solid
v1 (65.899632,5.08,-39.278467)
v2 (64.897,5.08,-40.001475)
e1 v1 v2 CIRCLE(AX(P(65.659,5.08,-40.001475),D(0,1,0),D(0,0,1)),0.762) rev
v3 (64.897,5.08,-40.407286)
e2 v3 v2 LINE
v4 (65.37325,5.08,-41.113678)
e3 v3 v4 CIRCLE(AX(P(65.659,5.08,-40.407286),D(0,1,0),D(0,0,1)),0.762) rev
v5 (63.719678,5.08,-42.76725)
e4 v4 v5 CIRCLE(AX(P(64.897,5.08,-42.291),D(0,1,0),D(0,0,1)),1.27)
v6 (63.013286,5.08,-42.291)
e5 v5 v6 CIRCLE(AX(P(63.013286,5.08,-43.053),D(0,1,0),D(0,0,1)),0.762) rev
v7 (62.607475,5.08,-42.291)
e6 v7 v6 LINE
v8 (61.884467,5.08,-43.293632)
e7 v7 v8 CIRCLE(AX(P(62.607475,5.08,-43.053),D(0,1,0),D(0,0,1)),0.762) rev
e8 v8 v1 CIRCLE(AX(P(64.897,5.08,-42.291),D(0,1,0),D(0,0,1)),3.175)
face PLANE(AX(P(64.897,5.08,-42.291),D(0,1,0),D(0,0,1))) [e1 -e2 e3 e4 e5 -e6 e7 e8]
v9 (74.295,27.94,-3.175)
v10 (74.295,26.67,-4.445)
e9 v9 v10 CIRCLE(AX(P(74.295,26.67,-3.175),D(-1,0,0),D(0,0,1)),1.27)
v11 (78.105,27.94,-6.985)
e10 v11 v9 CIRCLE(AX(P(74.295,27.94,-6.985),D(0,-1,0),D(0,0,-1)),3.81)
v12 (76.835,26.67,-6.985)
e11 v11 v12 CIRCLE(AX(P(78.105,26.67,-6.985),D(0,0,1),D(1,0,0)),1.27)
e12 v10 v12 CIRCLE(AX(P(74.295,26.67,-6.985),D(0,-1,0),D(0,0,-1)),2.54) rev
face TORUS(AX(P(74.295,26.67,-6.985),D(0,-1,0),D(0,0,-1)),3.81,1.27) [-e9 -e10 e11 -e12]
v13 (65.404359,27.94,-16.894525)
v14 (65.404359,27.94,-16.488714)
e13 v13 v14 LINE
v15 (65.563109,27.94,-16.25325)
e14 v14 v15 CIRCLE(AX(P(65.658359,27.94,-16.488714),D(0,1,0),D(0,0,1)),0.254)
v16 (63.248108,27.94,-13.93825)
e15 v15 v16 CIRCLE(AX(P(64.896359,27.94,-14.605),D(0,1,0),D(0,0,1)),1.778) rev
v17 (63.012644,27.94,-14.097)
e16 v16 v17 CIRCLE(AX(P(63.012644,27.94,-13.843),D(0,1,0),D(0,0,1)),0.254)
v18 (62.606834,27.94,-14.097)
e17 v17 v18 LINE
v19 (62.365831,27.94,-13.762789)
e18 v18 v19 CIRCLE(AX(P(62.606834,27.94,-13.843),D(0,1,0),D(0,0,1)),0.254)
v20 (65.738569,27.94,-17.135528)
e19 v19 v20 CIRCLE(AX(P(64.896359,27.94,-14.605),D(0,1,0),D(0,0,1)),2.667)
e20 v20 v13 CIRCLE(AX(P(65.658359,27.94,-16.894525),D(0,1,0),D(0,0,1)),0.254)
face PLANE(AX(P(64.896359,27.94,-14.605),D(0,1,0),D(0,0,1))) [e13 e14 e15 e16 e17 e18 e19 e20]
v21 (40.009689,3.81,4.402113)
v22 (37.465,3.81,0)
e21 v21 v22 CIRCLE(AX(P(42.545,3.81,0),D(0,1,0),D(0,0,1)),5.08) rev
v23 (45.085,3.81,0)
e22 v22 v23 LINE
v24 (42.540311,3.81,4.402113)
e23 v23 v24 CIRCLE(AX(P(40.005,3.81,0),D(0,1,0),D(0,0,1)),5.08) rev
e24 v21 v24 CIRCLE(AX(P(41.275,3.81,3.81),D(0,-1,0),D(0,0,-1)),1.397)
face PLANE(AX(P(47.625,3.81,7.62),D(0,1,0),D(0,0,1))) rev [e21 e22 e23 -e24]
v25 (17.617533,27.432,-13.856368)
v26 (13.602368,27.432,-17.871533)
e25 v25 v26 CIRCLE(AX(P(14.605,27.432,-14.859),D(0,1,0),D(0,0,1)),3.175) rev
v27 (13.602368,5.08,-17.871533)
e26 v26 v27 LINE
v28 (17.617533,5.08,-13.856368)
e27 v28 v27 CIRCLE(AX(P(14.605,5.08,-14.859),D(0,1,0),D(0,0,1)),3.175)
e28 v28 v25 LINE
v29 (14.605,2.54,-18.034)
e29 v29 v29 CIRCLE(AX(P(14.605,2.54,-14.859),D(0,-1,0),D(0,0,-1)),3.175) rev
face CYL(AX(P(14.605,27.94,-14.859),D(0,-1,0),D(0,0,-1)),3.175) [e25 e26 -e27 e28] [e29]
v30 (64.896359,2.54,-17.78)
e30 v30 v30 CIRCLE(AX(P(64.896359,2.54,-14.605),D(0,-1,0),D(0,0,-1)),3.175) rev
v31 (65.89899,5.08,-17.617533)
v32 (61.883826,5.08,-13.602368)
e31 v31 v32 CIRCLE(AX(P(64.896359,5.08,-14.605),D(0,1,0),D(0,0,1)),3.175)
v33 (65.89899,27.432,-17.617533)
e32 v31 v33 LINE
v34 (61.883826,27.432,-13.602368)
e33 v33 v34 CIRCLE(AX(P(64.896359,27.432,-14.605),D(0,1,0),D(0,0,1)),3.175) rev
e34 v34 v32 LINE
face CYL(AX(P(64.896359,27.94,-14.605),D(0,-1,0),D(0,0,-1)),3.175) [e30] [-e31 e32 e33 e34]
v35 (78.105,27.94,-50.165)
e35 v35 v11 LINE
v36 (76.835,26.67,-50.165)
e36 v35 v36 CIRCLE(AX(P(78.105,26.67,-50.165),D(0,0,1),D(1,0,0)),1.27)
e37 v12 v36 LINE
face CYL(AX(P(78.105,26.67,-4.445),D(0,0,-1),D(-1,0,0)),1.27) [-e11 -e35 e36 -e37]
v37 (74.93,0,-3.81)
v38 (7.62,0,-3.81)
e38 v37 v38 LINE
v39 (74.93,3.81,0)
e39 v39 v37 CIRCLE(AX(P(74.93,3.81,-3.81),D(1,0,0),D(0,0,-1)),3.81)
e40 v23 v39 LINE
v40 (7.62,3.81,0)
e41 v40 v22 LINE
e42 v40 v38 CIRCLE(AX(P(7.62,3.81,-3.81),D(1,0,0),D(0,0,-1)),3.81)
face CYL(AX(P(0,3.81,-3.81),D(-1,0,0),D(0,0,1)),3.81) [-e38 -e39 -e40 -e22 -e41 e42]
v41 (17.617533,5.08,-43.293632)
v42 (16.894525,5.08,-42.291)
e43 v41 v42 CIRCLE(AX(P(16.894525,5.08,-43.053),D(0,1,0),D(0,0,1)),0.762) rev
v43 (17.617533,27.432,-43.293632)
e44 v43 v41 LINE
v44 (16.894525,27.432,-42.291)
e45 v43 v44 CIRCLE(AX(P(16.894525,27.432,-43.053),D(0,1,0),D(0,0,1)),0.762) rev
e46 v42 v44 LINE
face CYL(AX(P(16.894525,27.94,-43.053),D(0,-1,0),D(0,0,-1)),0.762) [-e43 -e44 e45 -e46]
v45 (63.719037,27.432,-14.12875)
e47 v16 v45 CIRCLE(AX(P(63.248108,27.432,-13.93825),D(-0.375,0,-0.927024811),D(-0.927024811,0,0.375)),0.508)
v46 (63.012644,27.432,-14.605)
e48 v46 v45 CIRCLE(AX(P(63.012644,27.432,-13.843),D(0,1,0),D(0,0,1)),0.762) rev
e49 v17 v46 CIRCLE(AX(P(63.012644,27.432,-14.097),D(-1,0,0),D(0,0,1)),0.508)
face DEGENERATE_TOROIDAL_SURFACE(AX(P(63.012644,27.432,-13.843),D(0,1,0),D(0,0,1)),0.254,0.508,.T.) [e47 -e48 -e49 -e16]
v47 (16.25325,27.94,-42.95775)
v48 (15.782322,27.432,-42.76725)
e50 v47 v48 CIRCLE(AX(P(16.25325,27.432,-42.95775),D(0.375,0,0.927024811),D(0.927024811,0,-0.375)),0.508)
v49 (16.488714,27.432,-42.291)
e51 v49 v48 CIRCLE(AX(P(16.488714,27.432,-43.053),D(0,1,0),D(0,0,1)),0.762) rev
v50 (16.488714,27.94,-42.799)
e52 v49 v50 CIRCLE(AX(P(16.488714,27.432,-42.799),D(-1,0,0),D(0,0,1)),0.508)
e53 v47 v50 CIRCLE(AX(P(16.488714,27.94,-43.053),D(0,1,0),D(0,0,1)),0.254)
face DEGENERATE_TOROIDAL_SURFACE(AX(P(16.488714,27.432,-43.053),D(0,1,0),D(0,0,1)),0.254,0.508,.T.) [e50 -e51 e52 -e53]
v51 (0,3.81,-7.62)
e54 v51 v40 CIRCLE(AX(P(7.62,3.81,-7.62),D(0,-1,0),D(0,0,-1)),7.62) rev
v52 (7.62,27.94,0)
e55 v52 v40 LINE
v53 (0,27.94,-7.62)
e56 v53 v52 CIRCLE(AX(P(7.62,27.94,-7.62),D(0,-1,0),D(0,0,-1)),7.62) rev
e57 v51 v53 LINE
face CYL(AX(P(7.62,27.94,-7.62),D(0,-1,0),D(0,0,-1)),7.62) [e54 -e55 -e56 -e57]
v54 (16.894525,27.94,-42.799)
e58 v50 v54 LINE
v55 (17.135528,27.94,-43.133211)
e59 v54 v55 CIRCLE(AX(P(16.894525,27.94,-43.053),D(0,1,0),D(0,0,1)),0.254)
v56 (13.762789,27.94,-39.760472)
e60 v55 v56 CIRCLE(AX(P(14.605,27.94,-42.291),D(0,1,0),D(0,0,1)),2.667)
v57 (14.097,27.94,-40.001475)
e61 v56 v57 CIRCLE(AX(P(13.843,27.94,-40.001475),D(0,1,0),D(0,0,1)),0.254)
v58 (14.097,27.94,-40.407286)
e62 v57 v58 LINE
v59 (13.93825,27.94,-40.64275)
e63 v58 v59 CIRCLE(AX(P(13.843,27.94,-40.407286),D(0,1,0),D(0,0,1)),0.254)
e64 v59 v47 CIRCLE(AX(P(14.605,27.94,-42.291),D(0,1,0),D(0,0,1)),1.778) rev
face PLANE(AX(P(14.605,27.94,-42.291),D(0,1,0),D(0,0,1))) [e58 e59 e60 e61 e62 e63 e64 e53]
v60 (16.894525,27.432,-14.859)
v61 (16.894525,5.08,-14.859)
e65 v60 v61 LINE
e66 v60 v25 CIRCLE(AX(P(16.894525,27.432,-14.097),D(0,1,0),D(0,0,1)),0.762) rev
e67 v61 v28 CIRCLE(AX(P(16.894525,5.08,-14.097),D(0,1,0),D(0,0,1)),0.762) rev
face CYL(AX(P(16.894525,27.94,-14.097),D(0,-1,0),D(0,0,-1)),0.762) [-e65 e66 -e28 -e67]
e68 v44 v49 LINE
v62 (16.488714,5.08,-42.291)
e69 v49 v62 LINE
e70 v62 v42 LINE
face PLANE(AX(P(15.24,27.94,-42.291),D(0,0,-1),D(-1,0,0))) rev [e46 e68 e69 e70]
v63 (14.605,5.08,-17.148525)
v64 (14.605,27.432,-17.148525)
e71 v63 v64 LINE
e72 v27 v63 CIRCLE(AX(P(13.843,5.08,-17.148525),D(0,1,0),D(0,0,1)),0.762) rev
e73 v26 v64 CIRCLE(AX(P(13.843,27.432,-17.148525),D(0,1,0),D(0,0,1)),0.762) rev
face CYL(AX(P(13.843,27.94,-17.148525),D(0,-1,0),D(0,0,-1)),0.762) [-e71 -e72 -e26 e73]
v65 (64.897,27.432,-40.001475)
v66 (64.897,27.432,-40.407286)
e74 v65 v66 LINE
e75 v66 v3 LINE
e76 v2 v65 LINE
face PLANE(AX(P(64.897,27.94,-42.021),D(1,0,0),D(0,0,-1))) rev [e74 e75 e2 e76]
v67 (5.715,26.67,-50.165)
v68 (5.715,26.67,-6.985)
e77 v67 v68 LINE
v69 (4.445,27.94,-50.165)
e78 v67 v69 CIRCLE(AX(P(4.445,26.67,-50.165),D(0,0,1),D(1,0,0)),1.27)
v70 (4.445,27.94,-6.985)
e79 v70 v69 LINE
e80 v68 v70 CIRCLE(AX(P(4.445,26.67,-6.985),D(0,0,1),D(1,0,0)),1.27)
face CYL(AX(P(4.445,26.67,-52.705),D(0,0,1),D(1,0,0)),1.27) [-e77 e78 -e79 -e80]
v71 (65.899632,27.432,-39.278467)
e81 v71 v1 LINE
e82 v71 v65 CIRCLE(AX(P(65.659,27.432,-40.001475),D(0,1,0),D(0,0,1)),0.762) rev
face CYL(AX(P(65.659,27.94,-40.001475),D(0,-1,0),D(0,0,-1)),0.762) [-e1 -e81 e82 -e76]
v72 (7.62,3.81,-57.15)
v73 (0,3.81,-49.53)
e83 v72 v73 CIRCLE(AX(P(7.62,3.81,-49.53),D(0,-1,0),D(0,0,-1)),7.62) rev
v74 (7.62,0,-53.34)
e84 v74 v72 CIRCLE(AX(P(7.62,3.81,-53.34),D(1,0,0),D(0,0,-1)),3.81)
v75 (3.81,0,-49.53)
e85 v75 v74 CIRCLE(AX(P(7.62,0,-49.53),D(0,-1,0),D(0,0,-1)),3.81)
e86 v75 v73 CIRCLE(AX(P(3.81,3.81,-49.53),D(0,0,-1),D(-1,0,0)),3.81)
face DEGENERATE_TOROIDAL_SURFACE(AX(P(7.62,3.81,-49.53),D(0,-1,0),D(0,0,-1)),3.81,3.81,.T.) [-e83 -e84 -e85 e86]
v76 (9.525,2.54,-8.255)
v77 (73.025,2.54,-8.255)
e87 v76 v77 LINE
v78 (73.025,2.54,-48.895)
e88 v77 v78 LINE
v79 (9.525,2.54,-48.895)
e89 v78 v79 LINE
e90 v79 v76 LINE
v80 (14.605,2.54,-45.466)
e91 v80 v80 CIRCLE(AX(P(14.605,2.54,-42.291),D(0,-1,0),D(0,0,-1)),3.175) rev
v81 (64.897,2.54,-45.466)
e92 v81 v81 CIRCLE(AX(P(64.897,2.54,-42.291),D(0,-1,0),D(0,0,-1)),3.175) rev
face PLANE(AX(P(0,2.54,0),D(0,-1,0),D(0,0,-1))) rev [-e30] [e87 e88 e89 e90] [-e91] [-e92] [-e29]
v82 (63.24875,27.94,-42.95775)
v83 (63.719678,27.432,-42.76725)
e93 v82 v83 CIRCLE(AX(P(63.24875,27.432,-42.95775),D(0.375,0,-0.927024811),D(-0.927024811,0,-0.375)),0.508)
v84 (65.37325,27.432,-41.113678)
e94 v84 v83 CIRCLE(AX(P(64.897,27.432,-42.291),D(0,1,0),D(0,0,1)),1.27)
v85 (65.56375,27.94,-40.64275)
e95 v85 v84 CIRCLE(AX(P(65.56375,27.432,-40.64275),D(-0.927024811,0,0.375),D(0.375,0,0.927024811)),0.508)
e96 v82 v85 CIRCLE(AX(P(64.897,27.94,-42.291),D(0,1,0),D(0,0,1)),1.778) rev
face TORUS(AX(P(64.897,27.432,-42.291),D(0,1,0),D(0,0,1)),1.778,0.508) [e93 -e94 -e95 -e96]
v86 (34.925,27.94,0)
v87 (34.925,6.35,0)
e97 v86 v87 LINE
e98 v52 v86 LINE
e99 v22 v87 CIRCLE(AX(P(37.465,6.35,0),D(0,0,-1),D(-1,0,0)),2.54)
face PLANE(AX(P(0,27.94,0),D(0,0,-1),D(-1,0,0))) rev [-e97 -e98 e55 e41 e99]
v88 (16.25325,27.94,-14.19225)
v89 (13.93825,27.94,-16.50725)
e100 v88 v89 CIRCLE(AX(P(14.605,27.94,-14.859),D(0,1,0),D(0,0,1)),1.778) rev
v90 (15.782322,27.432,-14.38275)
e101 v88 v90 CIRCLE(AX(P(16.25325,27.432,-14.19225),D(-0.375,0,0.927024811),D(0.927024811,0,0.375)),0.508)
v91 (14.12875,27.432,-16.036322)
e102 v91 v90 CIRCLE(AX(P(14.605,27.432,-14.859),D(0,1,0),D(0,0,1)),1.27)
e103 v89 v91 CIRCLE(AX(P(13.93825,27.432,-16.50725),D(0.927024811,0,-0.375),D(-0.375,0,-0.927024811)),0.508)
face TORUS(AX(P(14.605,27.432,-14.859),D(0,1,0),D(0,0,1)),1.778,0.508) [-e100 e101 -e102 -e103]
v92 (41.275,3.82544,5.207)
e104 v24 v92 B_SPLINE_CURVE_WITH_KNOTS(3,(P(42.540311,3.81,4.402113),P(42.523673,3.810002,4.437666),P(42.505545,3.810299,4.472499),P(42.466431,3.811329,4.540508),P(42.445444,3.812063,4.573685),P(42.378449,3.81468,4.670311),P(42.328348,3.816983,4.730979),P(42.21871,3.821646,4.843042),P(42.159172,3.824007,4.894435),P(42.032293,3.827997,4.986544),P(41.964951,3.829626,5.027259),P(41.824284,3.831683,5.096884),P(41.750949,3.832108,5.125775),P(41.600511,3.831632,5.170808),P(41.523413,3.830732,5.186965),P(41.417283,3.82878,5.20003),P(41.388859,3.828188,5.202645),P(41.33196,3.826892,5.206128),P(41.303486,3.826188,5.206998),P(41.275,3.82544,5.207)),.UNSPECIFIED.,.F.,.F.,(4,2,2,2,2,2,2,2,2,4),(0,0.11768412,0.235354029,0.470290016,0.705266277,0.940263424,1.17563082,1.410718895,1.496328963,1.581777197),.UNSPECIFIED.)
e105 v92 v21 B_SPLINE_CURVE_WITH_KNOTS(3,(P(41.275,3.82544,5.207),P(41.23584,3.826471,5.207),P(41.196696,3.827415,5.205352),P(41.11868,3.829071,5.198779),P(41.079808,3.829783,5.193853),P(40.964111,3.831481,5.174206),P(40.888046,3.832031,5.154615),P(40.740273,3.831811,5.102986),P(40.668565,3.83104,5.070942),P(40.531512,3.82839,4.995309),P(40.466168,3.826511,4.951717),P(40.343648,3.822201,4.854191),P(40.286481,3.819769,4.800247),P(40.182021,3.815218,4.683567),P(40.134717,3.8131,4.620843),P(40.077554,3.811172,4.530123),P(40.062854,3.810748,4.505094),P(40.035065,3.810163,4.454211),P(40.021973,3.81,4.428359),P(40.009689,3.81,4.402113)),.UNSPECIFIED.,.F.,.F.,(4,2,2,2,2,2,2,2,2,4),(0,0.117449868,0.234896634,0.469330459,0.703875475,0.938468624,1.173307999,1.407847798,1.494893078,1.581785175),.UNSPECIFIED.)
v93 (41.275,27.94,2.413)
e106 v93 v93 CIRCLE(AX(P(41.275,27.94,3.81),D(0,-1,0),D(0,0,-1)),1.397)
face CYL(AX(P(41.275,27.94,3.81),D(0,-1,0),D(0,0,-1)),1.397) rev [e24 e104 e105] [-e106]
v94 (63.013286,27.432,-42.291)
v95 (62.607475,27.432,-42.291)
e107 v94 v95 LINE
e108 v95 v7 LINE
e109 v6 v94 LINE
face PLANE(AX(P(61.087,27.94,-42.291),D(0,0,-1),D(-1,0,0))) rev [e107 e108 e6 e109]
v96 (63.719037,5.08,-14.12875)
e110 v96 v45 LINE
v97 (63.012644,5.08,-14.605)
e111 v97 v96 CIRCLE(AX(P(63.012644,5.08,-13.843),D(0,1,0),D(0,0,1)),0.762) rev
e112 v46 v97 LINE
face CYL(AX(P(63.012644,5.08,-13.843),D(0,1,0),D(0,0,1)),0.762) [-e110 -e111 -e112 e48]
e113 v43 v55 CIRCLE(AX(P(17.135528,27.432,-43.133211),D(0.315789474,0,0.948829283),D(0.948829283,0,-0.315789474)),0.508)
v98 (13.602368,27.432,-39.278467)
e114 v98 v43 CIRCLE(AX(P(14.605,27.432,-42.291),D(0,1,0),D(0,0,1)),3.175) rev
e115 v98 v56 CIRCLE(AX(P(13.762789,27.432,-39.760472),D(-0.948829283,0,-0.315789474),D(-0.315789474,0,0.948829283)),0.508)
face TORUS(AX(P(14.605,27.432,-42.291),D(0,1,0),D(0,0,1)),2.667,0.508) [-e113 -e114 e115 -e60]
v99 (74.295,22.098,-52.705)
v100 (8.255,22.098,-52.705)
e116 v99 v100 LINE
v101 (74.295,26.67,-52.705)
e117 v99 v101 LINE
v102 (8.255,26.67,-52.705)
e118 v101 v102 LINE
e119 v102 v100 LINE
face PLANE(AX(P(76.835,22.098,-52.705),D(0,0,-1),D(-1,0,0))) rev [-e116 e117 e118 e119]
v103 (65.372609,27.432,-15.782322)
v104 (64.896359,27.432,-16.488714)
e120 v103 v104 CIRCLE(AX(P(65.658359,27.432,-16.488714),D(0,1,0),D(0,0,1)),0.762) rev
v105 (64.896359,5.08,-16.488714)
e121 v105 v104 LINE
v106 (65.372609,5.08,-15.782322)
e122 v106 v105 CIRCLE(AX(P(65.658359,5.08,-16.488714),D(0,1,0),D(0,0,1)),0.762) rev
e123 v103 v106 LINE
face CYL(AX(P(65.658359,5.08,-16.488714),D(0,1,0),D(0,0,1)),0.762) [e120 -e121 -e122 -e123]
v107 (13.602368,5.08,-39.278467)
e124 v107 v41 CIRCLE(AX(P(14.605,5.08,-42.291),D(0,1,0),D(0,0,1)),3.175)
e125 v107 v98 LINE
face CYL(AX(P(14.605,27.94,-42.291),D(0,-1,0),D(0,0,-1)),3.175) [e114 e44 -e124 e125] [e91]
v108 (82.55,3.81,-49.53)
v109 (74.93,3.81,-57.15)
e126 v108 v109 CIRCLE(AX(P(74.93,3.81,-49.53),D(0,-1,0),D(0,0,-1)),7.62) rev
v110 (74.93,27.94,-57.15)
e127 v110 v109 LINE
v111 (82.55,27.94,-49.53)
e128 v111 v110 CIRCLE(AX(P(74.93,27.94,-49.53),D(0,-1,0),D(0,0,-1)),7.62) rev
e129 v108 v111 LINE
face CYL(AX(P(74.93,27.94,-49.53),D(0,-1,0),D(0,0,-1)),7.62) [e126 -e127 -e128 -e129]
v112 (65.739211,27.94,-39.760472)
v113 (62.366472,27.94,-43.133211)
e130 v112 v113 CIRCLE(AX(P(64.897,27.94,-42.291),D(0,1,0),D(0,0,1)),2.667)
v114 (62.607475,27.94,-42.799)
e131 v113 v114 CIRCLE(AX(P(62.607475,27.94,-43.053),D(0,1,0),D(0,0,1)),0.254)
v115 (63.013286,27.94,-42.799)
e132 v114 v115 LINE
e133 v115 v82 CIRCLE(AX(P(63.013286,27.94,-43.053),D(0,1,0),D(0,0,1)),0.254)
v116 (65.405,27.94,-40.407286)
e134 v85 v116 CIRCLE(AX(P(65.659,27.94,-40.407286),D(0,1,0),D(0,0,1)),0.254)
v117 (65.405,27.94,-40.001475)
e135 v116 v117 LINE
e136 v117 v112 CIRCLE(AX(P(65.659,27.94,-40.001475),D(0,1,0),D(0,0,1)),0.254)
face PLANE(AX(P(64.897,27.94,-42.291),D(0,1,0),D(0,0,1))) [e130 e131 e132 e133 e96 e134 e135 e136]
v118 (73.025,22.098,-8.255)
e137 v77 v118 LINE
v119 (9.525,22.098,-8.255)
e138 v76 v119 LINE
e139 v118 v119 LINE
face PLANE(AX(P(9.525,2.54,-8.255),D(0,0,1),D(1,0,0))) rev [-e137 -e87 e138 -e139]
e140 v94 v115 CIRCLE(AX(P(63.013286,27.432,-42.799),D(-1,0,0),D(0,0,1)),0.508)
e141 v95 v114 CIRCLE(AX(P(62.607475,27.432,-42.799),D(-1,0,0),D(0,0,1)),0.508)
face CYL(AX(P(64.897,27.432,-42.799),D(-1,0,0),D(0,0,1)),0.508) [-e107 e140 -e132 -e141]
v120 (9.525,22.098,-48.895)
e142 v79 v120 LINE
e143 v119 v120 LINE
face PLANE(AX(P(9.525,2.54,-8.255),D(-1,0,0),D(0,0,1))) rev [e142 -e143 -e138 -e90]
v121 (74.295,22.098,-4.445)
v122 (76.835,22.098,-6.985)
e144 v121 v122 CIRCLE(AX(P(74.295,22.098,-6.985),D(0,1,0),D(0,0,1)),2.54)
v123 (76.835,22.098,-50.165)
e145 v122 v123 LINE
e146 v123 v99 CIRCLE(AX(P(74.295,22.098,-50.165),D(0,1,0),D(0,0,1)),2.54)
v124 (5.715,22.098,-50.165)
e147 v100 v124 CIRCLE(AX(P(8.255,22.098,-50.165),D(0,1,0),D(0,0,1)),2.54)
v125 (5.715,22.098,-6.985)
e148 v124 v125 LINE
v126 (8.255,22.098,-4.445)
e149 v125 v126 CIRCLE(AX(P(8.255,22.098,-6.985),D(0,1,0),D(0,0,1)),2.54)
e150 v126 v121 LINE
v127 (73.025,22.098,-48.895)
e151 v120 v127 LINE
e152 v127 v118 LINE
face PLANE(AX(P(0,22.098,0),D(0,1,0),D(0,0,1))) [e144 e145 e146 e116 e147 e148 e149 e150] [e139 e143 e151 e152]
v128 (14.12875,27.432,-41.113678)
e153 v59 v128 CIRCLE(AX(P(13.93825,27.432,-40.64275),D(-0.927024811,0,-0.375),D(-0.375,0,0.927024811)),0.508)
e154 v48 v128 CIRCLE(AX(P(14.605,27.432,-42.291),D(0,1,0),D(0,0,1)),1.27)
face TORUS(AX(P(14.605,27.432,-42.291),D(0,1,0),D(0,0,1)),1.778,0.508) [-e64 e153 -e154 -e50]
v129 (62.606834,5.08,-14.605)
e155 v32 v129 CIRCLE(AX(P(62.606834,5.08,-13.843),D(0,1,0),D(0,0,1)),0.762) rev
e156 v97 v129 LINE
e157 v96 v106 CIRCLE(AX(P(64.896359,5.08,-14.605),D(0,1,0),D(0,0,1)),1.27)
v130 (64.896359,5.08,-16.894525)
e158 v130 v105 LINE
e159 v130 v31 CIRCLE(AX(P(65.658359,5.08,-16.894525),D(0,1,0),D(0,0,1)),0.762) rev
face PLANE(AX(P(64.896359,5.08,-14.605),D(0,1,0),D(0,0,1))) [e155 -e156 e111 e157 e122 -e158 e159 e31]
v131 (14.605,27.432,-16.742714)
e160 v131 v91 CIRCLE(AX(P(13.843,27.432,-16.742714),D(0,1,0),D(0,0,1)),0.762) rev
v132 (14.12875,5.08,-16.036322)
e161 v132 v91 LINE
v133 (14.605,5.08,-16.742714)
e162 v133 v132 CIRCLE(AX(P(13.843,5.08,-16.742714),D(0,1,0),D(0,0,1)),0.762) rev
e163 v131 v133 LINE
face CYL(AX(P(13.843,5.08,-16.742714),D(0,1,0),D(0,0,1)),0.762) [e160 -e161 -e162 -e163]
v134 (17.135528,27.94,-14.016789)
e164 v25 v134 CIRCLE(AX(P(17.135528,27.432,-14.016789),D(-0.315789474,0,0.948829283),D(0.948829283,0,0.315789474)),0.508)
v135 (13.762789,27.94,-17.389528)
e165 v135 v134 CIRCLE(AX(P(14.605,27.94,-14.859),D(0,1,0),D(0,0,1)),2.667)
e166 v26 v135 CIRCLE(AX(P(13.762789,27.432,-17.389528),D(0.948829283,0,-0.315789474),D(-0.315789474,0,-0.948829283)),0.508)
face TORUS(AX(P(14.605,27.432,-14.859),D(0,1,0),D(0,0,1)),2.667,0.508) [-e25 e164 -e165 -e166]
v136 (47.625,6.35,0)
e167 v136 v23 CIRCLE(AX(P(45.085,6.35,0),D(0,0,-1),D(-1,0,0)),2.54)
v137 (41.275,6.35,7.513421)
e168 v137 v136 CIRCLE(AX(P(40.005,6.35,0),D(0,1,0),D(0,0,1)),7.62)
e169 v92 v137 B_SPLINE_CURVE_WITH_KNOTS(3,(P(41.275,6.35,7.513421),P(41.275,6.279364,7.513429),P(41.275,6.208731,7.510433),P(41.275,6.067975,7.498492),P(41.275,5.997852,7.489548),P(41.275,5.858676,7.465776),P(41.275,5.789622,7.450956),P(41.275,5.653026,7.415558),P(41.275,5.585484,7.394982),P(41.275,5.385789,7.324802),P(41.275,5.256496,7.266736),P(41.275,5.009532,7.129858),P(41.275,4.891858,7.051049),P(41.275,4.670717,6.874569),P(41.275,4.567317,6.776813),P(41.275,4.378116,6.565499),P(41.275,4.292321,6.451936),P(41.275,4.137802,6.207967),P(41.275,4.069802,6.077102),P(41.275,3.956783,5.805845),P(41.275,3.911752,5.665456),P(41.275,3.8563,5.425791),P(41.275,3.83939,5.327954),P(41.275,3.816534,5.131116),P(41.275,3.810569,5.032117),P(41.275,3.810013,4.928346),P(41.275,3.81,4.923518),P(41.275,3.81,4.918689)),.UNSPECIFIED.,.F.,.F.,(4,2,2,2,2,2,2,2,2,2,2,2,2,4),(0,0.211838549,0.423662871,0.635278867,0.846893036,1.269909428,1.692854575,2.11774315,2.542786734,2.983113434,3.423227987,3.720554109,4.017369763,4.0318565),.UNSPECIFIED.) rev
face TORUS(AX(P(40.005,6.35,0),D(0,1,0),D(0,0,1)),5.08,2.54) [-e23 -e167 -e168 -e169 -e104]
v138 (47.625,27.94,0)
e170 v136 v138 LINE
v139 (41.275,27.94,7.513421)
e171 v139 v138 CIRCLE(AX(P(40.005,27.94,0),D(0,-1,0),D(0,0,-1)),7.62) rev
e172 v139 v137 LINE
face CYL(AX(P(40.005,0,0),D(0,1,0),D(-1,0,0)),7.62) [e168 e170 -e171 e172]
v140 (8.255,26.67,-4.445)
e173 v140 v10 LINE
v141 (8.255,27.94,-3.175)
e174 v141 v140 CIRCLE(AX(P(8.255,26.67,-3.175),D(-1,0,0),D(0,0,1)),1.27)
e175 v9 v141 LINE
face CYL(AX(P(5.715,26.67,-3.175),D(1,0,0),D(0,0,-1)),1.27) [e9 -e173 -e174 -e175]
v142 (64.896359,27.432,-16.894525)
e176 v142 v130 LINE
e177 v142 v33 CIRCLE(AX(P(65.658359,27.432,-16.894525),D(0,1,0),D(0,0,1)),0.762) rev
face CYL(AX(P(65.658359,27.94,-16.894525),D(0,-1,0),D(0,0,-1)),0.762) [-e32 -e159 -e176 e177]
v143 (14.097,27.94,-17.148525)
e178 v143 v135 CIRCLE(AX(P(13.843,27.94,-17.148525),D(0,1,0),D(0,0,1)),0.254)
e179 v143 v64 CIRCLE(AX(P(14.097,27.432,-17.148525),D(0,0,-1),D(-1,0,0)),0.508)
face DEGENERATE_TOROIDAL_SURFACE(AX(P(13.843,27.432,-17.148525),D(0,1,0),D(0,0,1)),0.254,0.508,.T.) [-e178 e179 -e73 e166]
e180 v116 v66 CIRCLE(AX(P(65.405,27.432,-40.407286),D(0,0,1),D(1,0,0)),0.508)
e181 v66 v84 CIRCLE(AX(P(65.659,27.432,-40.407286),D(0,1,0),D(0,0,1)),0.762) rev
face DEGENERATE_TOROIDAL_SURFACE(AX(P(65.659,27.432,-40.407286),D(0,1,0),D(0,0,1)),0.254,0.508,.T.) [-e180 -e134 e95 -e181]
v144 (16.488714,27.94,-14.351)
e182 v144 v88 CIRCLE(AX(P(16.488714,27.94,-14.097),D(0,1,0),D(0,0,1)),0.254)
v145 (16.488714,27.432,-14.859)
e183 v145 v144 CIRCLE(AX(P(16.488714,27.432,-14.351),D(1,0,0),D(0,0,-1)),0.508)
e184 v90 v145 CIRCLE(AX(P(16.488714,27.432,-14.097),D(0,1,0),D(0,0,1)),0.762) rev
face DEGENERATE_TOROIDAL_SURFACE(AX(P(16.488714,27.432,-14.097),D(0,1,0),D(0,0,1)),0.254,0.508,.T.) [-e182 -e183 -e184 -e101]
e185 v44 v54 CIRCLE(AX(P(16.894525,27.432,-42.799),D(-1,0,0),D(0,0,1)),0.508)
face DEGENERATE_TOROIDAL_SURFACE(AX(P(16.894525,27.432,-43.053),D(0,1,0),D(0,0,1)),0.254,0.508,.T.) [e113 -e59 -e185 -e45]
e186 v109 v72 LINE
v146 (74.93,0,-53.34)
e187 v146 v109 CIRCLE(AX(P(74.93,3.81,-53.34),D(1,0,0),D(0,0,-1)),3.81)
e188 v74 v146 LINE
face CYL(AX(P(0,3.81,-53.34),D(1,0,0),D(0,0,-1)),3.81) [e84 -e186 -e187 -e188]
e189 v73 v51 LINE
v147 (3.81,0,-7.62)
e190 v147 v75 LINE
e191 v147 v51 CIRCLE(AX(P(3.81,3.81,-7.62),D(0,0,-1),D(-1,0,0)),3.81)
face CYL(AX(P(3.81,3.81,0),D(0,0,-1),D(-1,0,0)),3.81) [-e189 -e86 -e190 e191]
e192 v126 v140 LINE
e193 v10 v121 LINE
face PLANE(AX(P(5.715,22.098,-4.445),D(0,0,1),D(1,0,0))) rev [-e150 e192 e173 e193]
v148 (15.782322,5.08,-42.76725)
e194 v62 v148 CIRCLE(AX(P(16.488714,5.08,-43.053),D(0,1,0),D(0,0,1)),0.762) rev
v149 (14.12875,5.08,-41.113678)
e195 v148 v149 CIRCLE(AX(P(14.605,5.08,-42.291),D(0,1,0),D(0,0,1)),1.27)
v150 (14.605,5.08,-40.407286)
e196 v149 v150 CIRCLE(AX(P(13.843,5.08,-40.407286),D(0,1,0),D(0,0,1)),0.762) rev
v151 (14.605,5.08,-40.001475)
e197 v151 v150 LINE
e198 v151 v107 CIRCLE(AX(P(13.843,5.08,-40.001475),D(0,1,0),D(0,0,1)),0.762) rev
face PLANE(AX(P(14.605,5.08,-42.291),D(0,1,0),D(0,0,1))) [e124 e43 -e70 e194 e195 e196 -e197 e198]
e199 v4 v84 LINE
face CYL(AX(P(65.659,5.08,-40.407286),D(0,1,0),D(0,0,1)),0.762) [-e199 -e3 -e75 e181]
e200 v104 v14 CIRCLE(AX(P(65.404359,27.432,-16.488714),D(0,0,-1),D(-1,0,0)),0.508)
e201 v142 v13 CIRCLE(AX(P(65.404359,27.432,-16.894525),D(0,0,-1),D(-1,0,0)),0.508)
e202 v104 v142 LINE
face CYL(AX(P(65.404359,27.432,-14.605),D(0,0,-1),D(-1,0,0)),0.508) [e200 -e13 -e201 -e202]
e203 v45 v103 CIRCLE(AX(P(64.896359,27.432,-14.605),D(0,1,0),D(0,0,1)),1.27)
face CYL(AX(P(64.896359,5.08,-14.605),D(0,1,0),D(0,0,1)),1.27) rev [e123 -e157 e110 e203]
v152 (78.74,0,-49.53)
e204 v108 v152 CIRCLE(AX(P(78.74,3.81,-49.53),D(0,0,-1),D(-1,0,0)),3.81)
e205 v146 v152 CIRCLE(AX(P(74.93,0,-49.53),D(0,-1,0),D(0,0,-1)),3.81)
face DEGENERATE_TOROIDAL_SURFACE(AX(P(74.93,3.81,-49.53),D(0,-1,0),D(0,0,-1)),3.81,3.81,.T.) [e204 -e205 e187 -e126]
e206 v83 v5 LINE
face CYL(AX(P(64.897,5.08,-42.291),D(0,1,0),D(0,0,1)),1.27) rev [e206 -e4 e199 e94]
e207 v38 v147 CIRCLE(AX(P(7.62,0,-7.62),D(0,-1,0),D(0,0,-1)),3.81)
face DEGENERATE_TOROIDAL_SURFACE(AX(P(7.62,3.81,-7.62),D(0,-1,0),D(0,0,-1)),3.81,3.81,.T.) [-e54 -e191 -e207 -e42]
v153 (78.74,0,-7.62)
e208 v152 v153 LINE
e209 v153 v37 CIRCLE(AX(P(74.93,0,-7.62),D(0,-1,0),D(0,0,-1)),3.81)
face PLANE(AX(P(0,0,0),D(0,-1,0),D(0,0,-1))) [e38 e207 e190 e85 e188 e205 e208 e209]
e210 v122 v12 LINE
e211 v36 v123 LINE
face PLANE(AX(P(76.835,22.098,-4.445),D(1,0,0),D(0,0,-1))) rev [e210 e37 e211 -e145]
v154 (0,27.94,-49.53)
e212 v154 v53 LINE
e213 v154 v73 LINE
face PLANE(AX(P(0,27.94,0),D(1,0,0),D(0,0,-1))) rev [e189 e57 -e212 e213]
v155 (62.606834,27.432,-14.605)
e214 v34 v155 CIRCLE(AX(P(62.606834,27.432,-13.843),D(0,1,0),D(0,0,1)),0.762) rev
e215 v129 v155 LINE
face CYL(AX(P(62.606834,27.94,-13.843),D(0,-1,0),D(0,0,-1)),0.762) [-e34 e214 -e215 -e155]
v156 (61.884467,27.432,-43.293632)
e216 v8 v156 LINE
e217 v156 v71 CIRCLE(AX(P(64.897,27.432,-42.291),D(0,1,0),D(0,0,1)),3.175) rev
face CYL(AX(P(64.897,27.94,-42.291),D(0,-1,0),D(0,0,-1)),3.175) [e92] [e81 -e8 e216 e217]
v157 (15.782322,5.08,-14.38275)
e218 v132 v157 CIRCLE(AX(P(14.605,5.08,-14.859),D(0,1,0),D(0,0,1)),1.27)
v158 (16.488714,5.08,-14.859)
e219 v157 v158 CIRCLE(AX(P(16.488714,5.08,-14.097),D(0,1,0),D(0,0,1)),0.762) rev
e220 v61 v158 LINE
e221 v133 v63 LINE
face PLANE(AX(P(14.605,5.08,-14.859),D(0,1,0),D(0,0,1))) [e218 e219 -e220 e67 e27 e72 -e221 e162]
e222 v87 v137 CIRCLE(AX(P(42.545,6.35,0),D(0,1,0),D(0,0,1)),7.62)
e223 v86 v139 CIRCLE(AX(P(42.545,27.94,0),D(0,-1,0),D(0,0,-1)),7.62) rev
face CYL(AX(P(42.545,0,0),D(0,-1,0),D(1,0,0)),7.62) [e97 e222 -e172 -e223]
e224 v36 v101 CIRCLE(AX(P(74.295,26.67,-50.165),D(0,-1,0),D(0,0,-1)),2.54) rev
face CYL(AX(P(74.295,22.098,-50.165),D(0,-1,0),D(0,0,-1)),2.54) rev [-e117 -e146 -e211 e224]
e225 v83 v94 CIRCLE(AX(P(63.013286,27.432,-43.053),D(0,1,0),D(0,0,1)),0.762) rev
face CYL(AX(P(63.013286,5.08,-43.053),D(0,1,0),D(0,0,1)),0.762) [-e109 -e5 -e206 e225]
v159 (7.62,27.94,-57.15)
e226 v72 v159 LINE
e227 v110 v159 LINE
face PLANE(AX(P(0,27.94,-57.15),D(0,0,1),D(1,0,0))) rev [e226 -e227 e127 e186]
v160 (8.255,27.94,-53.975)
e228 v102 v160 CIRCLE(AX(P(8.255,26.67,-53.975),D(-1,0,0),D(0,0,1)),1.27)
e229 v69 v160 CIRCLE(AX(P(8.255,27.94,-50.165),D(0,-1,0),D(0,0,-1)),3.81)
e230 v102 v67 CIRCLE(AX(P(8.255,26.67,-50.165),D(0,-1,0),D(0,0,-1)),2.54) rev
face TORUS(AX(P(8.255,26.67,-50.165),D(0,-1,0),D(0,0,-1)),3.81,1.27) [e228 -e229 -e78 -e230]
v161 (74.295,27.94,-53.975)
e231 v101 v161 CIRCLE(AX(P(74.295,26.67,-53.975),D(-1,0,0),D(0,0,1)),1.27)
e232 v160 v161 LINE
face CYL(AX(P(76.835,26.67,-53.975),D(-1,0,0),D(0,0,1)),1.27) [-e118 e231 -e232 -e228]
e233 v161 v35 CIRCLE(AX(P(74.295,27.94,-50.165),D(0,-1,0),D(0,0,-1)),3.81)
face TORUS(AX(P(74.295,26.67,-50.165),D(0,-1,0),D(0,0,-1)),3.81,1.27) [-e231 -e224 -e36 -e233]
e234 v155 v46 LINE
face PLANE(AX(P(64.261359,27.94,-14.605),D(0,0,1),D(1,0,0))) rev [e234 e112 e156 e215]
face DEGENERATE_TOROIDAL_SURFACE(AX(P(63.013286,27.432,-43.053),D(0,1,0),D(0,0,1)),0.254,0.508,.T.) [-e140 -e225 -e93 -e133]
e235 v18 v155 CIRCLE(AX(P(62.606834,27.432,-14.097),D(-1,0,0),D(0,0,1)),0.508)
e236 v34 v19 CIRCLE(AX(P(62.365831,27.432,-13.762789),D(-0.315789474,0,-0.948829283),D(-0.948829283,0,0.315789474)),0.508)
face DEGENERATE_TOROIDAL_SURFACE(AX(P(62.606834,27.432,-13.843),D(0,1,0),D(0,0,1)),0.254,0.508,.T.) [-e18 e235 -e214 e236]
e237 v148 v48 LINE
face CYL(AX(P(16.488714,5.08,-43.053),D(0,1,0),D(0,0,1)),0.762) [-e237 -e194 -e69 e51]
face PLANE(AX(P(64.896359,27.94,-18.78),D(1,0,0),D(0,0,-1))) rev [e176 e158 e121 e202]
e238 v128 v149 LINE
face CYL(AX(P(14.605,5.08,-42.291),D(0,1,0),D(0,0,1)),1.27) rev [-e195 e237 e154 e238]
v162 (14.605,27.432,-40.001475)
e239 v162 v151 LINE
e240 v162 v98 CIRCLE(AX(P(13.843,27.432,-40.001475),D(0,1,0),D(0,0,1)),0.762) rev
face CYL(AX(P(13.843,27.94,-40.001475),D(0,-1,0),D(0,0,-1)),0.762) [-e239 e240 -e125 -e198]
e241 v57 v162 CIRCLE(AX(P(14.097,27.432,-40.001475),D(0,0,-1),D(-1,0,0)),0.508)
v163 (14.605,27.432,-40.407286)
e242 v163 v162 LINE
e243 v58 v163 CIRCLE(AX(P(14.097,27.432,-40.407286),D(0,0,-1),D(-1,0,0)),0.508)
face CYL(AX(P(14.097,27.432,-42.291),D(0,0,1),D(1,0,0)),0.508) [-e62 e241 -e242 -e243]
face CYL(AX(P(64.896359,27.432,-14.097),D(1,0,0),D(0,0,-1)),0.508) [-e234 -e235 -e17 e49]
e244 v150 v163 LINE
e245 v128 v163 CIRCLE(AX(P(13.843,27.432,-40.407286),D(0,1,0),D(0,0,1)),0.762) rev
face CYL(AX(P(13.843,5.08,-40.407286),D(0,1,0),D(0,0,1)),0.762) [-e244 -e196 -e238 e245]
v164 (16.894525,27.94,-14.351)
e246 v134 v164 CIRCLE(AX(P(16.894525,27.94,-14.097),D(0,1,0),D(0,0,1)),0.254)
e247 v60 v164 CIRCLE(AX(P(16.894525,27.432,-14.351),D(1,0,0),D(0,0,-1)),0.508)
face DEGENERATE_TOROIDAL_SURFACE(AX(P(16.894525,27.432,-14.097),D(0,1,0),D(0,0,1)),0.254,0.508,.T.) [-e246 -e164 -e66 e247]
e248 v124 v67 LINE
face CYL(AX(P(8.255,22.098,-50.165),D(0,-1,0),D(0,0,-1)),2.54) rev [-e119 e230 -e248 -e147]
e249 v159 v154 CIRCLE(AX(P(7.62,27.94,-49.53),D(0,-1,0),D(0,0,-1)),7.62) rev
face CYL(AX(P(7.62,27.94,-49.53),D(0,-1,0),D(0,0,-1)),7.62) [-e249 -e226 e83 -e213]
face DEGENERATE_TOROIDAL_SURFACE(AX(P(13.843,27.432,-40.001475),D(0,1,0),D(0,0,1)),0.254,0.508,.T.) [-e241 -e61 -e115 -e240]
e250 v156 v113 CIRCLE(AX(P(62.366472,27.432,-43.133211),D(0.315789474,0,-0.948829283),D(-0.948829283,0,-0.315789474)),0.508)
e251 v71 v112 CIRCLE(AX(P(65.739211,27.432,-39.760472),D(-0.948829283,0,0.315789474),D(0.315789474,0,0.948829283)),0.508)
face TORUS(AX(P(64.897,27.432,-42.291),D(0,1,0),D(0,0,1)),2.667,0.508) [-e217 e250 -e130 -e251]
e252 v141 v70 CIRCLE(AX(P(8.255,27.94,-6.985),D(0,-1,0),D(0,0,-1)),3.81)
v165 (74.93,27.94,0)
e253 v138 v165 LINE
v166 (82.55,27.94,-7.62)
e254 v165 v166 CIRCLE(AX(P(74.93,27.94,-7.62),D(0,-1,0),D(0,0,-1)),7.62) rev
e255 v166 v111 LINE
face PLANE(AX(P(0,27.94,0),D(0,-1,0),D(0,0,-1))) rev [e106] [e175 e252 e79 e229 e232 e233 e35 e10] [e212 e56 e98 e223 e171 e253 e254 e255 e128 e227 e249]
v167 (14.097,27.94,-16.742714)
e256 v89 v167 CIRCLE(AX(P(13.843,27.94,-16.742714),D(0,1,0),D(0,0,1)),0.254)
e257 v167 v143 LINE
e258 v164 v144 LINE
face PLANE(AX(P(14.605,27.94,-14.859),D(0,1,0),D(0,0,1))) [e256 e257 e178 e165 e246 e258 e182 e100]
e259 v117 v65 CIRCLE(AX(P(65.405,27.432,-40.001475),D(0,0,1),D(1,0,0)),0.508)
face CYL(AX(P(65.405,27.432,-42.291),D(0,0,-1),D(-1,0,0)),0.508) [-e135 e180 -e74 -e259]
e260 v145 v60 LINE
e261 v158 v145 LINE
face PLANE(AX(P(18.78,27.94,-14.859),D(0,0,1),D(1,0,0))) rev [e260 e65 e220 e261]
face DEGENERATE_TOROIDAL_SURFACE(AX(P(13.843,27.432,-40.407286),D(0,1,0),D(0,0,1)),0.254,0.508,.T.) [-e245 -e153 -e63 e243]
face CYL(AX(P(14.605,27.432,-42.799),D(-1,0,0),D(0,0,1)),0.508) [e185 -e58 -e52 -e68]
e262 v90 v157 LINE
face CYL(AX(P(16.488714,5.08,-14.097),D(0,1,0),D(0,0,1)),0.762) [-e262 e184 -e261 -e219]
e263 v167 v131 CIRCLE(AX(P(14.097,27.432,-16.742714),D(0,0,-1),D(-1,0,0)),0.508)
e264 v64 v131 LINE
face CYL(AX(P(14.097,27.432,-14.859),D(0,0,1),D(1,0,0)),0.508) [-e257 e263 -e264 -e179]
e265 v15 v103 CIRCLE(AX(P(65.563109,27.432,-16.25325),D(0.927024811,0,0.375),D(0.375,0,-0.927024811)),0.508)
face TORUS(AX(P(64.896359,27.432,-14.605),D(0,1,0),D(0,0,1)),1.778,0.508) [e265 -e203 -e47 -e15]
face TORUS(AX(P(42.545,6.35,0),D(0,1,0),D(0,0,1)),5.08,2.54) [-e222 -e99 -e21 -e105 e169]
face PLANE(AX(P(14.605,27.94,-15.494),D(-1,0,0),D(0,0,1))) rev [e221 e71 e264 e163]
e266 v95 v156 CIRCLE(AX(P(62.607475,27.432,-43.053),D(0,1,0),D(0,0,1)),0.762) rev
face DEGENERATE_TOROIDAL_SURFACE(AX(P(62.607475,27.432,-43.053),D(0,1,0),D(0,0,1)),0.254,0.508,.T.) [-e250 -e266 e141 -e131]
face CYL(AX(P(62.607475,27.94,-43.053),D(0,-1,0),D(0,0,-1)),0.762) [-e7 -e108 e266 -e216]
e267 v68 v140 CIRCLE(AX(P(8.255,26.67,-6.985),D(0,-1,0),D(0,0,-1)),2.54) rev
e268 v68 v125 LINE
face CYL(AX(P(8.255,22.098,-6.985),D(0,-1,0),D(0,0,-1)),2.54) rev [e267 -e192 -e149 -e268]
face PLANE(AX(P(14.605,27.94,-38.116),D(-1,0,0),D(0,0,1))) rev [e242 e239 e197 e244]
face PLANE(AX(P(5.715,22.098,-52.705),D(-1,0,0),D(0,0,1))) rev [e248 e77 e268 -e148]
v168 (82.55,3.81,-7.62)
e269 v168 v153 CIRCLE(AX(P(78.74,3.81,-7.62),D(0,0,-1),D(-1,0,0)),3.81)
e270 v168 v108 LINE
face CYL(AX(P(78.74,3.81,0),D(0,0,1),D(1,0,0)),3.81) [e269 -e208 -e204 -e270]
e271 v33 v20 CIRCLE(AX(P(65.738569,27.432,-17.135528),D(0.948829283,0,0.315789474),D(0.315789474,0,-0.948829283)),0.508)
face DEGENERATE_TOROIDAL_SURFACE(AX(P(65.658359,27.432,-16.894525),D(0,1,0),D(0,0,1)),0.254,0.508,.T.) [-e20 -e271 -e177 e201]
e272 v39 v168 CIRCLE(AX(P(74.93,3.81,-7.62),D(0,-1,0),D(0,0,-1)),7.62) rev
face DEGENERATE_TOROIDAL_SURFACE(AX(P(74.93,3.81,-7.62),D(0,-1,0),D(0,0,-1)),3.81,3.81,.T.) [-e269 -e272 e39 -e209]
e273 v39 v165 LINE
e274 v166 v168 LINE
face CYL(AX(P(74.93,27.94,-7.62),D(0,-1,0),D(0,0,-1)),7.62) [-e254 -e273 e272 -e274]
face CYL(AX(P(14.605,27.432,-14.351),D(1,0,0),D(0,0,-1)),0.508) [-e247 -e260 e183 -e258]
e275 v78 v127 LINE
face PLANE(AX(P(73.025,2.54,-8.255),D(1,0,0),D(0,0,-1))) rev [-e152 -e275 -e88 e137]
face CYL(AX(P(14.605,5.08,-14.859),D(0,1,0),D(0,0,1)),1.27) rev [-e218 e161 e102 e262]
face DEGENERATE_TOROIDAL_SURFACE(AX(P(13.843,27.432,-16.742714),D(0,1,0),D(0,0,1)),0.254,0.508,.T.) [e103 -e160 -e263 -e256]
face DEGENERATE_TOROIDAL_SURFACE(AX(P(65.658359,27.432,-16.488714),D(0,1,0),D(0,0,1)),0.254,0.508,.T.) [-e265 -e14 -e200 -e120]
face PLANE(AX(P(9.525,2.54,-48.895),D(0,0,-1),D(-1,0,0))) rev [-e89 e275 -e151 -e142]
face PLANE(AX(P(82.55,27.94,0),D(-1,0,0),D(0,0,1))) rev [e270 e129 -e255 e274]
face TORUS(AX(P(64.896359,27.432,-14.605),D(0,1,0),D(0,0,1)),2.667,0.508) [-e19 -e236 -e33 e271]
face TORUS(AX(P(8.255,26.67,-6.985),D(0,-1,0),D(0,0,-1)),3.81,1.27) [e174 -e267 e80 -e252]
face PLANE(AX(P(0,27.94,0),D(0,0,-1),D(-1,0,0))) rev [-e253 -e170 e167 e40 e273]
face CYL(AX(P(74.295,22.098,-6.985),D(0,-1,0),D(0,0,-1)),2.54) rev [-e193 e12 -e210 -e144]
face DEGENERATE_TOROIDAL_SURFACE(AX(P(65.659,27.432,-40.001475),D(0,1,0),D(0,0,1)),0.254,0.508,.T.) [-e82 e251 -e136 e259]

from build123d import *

# Parameters (mm, degrees)
SKETCH1_W               = 82.55
SKETCH1_H               = 57.15
BOSS_EXTRUDE1_DEPTH     = 27.94
FILLET2_R               = 7.62
FILLET3_R               = 3.81
SKETCH2_W               = 63.5
SKETCH2_H               = 40.64
CUT_EXTRUDE1_DEPTH      = 25.4
SKETCH9_W               = 12.7
SKETCH9_H               = 24.13
BOSS_EXTRUDE5_DEPTH     = 7.62
FILLET10_R              = 7.62
SKETCH7_W               = 71.12
SKETCH7_H               = 48.26
CUT_EXTRUDE4_DEPTH      = 5.842
FILLET12_R              = 2.54
FILLET13_R              = 1.27
SKETCH5_R               = 3.175
BOSS_EXTRUDE6_DEPTH     = 25.4
SKETCH11_R              = 1.27
CUT_EXTRUDE5_DEPTH      = 22.86
CUT_EXTRUDE_THIN1_DEPTH = 103.971863203
SKETCH20_R              = 1.397
CUT_EXTRUDE6_DEPTH      = 104.261231406
FILLET14_R              = 2.54
FILLET16_R              = 0.762
FILLET17_R              = 0.508


with BuildPart() as part:
    # Sketch1 → Boss-Extrude1 (new body)
    with BuildSketch(Plane(origin=(0, 0, 0), x_dir=(1, 0, 0), z_dir=(0, 1, 0))):
        with Locations((41.275, 28.575)):
            Rectangle(SKETCH1_W, SKETCH1_H)
    extrude(amount=BOSS_EXTRUDE1_DEPTH)

    # Fillet2
    fillet2_edges = [part.edges().sort_by_distance(p)[0] for p in [
        (0, 13.97, -57.15),
        (82.55, 13.97, -57.15),
        (82.55, 13.97, 0),
        (0, 13.97, 0),
    ]]
    fillet(fillet2_edges, radius=FILLET2_R)

    # Fillet3
    fillet3_edges = [part.edges().sort_by_distance(p)[0] for p in [
        (41.275, 0, -57.15),
        (0, 0, -28.575),
        (82.55, 0, -28.575),
        (41.275, 0, 0),
        (2.231846327, 0, -54.918153673),
        (2.231846327, 0, -2.231846327),
        (80.318153673, 0, -2.231846327),
        (80.318153673, 0, -54.918153673),
    ]]
    fillet(fillet3_edges, radius=FILLET3_R)

    # Sketch2 → Cut-Extrude1 (cut)
    with BuildSketch(Plane(origin=(0, 27.94, 0), x_dir=(1, 0, 0), z_dir=(0, 1, 0))):
        with Locations((41.275, 28.575)):
            Rectangle(SKETCH2_W, SKETCH2_H)
    extrude(amount=-CUT_EXTRUDE1_DEPTH, mode=Mode.SUBTRACT)

    # Sketch9 → Boss-Extrude5 (add)
    with BuildSketch(Plane.XY):
        with Locations((41.275, 15.875)):
            Rectangle(SKETCH9_W, SKETCH9_H)
    extrude(amount=BOSS_EXTRUDE5_DEPTH)

    # Fillet10
    # the kernel refuses this fillet: 7.62 mm, written as the material it takes off along each edge
    with BuildSketch(Plane(origin=(47.625, -15.24, 7.62), x_dir=(-1, 0, 0), z_dir=(0, 1, 0))) as fillet10_piece_1:
        with BuildLine():
            CenterArc((FILLET10_R, -FILLET10_R), FILLET10_R, 90, 90)
            Line((0, -FILLET10_R), (0, 0))
            Line((0, 0), (FILLET10_R, 0))
        make_face()
    extrude(amount=62.23, mode=Mode.SUBTRACT)
    with BuildSketch(Plane(origin=(34.925, 46.99, 7.62), x_dir=(0, 0, -1), z_dir=(0, -1, 0))) as fillet10_piece_2:
        with BuildLine():
            CenterArc((FILLET10_R, FILLET10_R), FILLET10_R, 180, 90)
            Line((0, FILLET10_R), (0, 0))
            Line((0, 0), (FILLET10_R, 0))
        make_face()
    extrude(amount=62.23, mode=Mode.SUBTRACT)

    # Sketch7 → Cut-Extrude4 (cut)
    with BuildSketch(Plane(origin=(0, 27.94, 0), x_dir=(1, 0, 0), z_dir=(0, 1, 0))):
        with Locations((41.275, 28.575)):
            Rectangle(SKETCH7_W, SKETCH7_H)
    extrude(amount=-CUT_EXTRUDE4_DEPTH, mode=Mode.SUBTRACT)

    # Fillet12
    fillet12_edges = [part.edges().sort_by_distance(p)[0] for p in [
        (5.715, 25.019, -52.705),
        (76.835, 25.019, -52.705),
        (76.835, 25.019, -4.445),
        (5.715, 25.019, -4.445),
    ]]
    fillet(fillet12_edges, radius=FILLET12_R)

    # Fillet13
    fillet13_edges = [part.edges().sort_by_distance(p)[0] for p in [
        (41.275, 27.94, -52.705),
        (76.835, 27.94, -28.575),
        (41.275, 27.94, -4.445),
        (5.715, 27.94, -28.575),
        (76.091051224, 27.94, -51.961051224),
        (76.091051224, 27.94, -5.188948776),
        (6.458948776, 27.94, -51.961051224),
        (6.458948776, 27.94, -5.188948776),
    ]]
    fillet(fillet13_edges, radius=FILLET13_R)

    # Sketch5 → Boss-Extrude6 (add)
    with BuildSketch(Plane(origin=(0, 2.54, 0), x_dir=(1, 0, 0), z_dir=(0, 1, 0))):
        with Locations(Location((14.605, 42.291, 0), (0, 0, 90))):
            Circle(SKETCH5_R)
        with Locations(Location((14.605, 14.859, 0), (0, 0, 90))):
            Circle(SKETCH5_R)
        with Locations(Location((64.897, 42.291, 0), (0, 0, 90))):
            Circle(SKETCH5_R)
        with Locations(Location((64.896358582, 14.605, 0), (0, 0, 90))):
            Circle(SKETCH5_R)
    extrude(amount=BOSS_EXTRUDE6_DEPTH)

    # Sketch11 → Cut-Extrude5 (cut)
    with BuildSketch(Plane(origin=(0, 27.94, 0), x_dir=(1, 0, 0), z_dir=(0, 1, 0))):
        with Locations(Location((14.605, 14.859, 0), (0, 0, 270))):
            Circle(SKETCH11_R)
        with Locations(Location((14.605, 42.291, 0), (0, 0, 270))):
            Circle(SKETCH11_R)
        with Locations(Location((64.896358582, 14.605, 0), (0, 0, 270))):
            Circle(SKETCH11_R)
        with Locations(Location((64.897, 42.291, 0), (0, 0, 270))):
            Circle(SKETCH11_R)
    extrude(amount=-CUT_EXTRUDE5_DEPTH, mode=Mode.SUBTRACT)

    # Sketch17 → Cut-Extrude-Thin1 (cut, through all)
    with BuildSketch(Plane(origin=(0, 5.08, 0), x_dir=(1, 0, 0), z_dir=(0, 1, 0))):
        with BuildLine():
            ThreePointArc((18.78, 42.291), (17.557170811, 39.338829189), (14.605, 38.116))
            Line((14.605, 38.116), (14.605, 41.656))
            ThreePointArc((14.605, 41.656), (15.054012806, 41.841987194), (15.24, 42.291))
            Line((15.24, 42.291), (18.78, 42.291))
        make_face()
        with BuildLine():
            ThreePointArc((60.721358582, 14.605), (61.94418777, 17.557170811), (64.896358582, 18.78))
            Line((64.896358582, 18.78), (64.896358582, 15.24))
            ThreePointArc((64.896358582, 15.24), (64.447345776, 15.054012806), (64.261358582, 14.605))
            Line((64.261358582, 14.605), (60.721358582, 14.605))
        make_face()
        with BuildLine():
            ThreePointArc((14.605, 19.034), (17.557170811, 17.811170811), (18.78, 14.859))
            Line((18.78, 14.859), (15.24, 14.859))
            ThreePointArc((15.24, 14.859), (15.054012806, 15.308012806), (14.605, 15.494))
            Line((14.605, 15.494), (14.605, 19.034))
        make_face()
        with BuildLine():
            ThreePointArc((64.627, 42.291), (64.706081169, 42.100081169), (64.897, 42.021))
            Line((64.897, 42.021), (64.897, 38.481))
            ThreePointArc((64.897, 38.481), (62.202923164, 39.596923164), (61.087, 42.291))
            Line((61.087, 42.291), (64.627, 42.291))
        make_face()
    extrude(amount=CUT_EXTRUDE_THIN1_DEPTH, mode=Mode.SUBTRACT)

    # Sketch20 → Cut-Extrude6 (cut, through all)
    with BuildSketch(Plane.XZ.offset(-3.81)):
        with Locations(Location((41.275, 3.81, 0), (0, 0, 270))):
            Circle(SKETCH20_R)
    extrude(amount=-CUT_EXTRUDE6_DEPTH, mode=Mode.SUBTRACT)

    # Fillet14
    # the kernel refuses this fillet: 2.54 mm, written as the material it takes off along each edge
    with BuildSketch(Plane(origin=(42.545, 3.81, 0), x_dir=(-1, 0, 0), z_dir=(0, 0, -1))) as fillet14_piece_1:
        with BuildLine():
            CenterArc((7.62 - FILLET14_R, FILLET14_R), FILLET14_R, 270, 90)
            Line((7.62 - FILLET14_R, 0), (7.62, 0))
            Line((7.62, 0), (7.62, FILLET14_R))
        make_face()
    revolve(axis=Axis((42.545, 3.81, 0), (0, 1, 0)), revolution_arc=128.167722704, mode=Mode.SUBTRACT)
    with BuildSketch(Plane(origin=(40.005, 3.81, 0), x_dir=(1, 0, 0), z_dir=(0, 0, -1))) as fillet14_piece_2:
        with BuildLine():
            CenterArc((7.62 - FILLET14_R, -FILLET14_R), FILLET14_R, 0, 90)
            Line((7.62 - FILLET14_R, 0), (7.62, 0))
            Line((7.62, 0), (7.62, -FILLET14_R))
        make_face()
    revolve(axis=Axis((40.005, 3.81, 0), (0, -1, 0)), revolution_arc=128.167722704, mode=Mode.SUBTRACT)

    # Fillet16
    # the kernel refuses this fillet: 0.762 mm, written as the material it takes off along each edge
    with BuildSketch(Plane(origin=(14.605, 30.47927354, -39.116), x_dir=(-0.9871244306106606, 0, -0.1599542387421456), z_dir=(0, -1, 0)), Plane(origin=(17.78, 30.47927354, -14.859), x_dir=(-0.15995423874214412, 0, 0.9871244306106608), z_dir=(0, -1, 0)), Plane(origin=(14.605, 5.08, -18.034), x_dir=(-0.9871244306106601, 0, 0.1599542387421475), z_dir=(0, 1, 0)), Plane(origin=(61.722, 30.47927354, -42.291), x_dir=(0.15995423874221992, 0, -0.9871244306106485), z_dir=(0, -1, 0))) as fillet16_piece_1:
        with BuildLine():
            CenterArc((0.893824286, 0.752188816), FILLET16_R, 170.795759915, 108.408480171)
            Line((0.14163547, 0.874073946), (0, 0))
            ThreePointArc((0, 0), (0.507854708, -0.040879933), (1.015709416, 0))
        make_face()
    extrude(amount=25.39927354, mode=Mode.SUBTRACT)
    with BuildSketch(Plane(origin=(14.605, 29.474286039, -41.021), x_dir=(0, 0, 1), z_dir=(0, -1, 0)), Plane(origin=(14.605, 5.08, -16.129), x_dir=(0, 0, -1), z_dir=(0, 1, 0))) as fillet16_piece_2:
        with BuildLine():
            CenterArc((0.613714416, 0.762), FILLET16_R, 202.024312837, 67.975687163)
            ThreePointArc((-0.09267849, 0.47625), (-0.02338492, 0.242591923), (0, 0))
            Line((0, 0), (0.613714416, 0))
        make_face()
    extrude(amount=24.394286039, mode=Mode.SUBTRACT)
    with BuildSketch(Plane(origin=(17.78, 30.47927354, -42.291), x_dir=(-0.1599542387421499, 0, -0.9871244306106597), z_dir=(0, -1, 0)), Plane(origin=(64.897, 30.47927354, -39.116), x_dir=(0.9871244306106357, 0, -0.1599542387422978), z_dir=(0, -1, 0)), Plane(origin=(64.896358582, 5.08, -17.78), x_dir=(0.9871244306106608, 0, 0.159954238742144), z_dir=(0, 1, 0)), Plane(origin=(61.721358582, 30.47927354, -14.605), x_dir=(0.1599542387421526, 0, 0.9871244306106594), z_dir=(0, -1, 0))) as fillet16_piece_3:
        with BuildLine():
            CenterArc((0.893824286, -0.752188816), FILLET16_R, 80.795759915, 108.408480171)
            Line((0.14163547, -0.874073946), (0, 0))
            ThreePointArc((0, 0), (0.507854708, 0.040879933), (1.015709416, 0))
        make_face()
    extrude(amount=25.39927354, mode=Mode.SUBTRACT)
    with BuildSketch(Plane(origin=(15.875, 5.08, -42.291), x_dir=(-0.19101726245689768, 0, -0.9815866774989729), z_dir=(0, 1, 0)), Plane(origin=(63.626358582, 5.08, -14.605), x_dir=(0.19101726245692474, 0, 0.9815866774989677), z_dir=(0, 1, 0))) as fillet16_piece_4:
        with BuildLine():
            CenterArc((0.630739001, -0.747969048), FILLET16_R, 101.012156419, 67.975687163)
            Line((-0.117230048, -0.602413894), (0, 0))
            ThreePointArc((0, 0), (0.242591923, -0.02338492), (0.485183847, 0))
        make_face()
    extrude(amount=24.394286039, mode=Mode.SUBTRACT)
    with BuildSketch(Plane(origin=(15.875, 5.08, -14.859), x_dir=(-0.19101726245687592, 0, 0.9815866774989771), z_dir=(0, 1, 0)), Plane(origin=(64.897, 29.474286039, -41.021), x_dir=(0.9815866774989668, 0, -0.19101726245692938), z_dir=(0, -1, 0)), Plane(origin=(64.896358582, 5.08, -15.875), x_dir=(0.9815866774989799, 0, 0.191017262456862), z_dir=(0, 1, 0))) as fillet16_piece_5:
        with BuildLine():
            CenterArc((0.630739001, 0.747969048), FILLET16_R, 191.012156419, 67.975687163)
            Line((-0.117230048, 0.602413894), (0, 0))
            ThreePointArc((0, 0), (0.242591923, 0.02338492), (0.485183847, 0))
        make_face()
    extrude(amount=24.394286039, mode=Mode.SUBTRACT)
    with BuildSketch(Plane(origin=(63.627, 5.08, -42.291), x_dir=(-1, 0, 0), z_dir=(0, 1, 0))) as fillet16_piece_6:
        with BuildLine():
            CenterArc((0.613714416, -0.762), FILLET16_R, 90, 67.975687163)
            ThreePointArc((-0.09267849, -0.47625), (-0.02338492, -0.242591923), (0, 0))
            Line((0, 0), (0.613714416, 0))
        make_face()
    extrude(amount=24.394286039, mode=Mode.SUBTRACT)

    # Fillet17
    fillet17_edges = [part.edges().sort_by_distance(p)[0] for p in [
        (11.470879933, 27.94, -42.798854708),
        (16.691619738, 27.94, -42.291),
        (14.605, 27.94, -40.204380262),
        (13.706974388, 27.94, -43.189025612),
        (14.288692011, 27.94, -39.383411326),
        (14.474817023, 27.94, -40.833256534),
        (16.062743466, 27.94, -42.421182977),
        (17.512588674, 27.94, -42.607307989),
        (68.031120067, 27.94, -42.798854708),
        (64.897, 27.94, -40.204380262),
        (62.810380262, 27.94, -42.291),
        (65.795025612, 27.94, -43.189025612),
        (65.213307989, 27.94, -39.383411326),
        (65.027182977, 27.94, -40.833256534),
        (63.439256534, 27.94, -42.421182977),
        (61.989411326, 27.94, -42.607307989),
        (67.141422612, 27.94, -12.35993597),
        (64.896358582, 27.94, -16.691619738),
        (65.794384194, 27.94, -13.706974388),
        (62.809738844, 27.94, -14.605),
        (61.988769907, 27.94, -14.288692011),
        (63.438615116, 27.94, -14.474817023),
        (65.026541559, 27.94, -16.062743466),
        (65.212666571, 27.94, -17.512588674),
        (12.35993597, 27.94, -12.61393597),
        (14.605, 27.94, -16.945619738),
        (16.691619738, 27.94, -14.859),
        (13.706974388, 27.94, -13.960974388),
        (17.512588674, 27.94, -14.542692011),
        (16.062743466, 27.94, -14.728817023),
        (14.474817023, 27.94, -16.316743466),
        (14.288692011, 27.94, -17.766588674),
    ]]
    fillet(fillet17_edges, radius=FILLET17_R)


solid = part.part
